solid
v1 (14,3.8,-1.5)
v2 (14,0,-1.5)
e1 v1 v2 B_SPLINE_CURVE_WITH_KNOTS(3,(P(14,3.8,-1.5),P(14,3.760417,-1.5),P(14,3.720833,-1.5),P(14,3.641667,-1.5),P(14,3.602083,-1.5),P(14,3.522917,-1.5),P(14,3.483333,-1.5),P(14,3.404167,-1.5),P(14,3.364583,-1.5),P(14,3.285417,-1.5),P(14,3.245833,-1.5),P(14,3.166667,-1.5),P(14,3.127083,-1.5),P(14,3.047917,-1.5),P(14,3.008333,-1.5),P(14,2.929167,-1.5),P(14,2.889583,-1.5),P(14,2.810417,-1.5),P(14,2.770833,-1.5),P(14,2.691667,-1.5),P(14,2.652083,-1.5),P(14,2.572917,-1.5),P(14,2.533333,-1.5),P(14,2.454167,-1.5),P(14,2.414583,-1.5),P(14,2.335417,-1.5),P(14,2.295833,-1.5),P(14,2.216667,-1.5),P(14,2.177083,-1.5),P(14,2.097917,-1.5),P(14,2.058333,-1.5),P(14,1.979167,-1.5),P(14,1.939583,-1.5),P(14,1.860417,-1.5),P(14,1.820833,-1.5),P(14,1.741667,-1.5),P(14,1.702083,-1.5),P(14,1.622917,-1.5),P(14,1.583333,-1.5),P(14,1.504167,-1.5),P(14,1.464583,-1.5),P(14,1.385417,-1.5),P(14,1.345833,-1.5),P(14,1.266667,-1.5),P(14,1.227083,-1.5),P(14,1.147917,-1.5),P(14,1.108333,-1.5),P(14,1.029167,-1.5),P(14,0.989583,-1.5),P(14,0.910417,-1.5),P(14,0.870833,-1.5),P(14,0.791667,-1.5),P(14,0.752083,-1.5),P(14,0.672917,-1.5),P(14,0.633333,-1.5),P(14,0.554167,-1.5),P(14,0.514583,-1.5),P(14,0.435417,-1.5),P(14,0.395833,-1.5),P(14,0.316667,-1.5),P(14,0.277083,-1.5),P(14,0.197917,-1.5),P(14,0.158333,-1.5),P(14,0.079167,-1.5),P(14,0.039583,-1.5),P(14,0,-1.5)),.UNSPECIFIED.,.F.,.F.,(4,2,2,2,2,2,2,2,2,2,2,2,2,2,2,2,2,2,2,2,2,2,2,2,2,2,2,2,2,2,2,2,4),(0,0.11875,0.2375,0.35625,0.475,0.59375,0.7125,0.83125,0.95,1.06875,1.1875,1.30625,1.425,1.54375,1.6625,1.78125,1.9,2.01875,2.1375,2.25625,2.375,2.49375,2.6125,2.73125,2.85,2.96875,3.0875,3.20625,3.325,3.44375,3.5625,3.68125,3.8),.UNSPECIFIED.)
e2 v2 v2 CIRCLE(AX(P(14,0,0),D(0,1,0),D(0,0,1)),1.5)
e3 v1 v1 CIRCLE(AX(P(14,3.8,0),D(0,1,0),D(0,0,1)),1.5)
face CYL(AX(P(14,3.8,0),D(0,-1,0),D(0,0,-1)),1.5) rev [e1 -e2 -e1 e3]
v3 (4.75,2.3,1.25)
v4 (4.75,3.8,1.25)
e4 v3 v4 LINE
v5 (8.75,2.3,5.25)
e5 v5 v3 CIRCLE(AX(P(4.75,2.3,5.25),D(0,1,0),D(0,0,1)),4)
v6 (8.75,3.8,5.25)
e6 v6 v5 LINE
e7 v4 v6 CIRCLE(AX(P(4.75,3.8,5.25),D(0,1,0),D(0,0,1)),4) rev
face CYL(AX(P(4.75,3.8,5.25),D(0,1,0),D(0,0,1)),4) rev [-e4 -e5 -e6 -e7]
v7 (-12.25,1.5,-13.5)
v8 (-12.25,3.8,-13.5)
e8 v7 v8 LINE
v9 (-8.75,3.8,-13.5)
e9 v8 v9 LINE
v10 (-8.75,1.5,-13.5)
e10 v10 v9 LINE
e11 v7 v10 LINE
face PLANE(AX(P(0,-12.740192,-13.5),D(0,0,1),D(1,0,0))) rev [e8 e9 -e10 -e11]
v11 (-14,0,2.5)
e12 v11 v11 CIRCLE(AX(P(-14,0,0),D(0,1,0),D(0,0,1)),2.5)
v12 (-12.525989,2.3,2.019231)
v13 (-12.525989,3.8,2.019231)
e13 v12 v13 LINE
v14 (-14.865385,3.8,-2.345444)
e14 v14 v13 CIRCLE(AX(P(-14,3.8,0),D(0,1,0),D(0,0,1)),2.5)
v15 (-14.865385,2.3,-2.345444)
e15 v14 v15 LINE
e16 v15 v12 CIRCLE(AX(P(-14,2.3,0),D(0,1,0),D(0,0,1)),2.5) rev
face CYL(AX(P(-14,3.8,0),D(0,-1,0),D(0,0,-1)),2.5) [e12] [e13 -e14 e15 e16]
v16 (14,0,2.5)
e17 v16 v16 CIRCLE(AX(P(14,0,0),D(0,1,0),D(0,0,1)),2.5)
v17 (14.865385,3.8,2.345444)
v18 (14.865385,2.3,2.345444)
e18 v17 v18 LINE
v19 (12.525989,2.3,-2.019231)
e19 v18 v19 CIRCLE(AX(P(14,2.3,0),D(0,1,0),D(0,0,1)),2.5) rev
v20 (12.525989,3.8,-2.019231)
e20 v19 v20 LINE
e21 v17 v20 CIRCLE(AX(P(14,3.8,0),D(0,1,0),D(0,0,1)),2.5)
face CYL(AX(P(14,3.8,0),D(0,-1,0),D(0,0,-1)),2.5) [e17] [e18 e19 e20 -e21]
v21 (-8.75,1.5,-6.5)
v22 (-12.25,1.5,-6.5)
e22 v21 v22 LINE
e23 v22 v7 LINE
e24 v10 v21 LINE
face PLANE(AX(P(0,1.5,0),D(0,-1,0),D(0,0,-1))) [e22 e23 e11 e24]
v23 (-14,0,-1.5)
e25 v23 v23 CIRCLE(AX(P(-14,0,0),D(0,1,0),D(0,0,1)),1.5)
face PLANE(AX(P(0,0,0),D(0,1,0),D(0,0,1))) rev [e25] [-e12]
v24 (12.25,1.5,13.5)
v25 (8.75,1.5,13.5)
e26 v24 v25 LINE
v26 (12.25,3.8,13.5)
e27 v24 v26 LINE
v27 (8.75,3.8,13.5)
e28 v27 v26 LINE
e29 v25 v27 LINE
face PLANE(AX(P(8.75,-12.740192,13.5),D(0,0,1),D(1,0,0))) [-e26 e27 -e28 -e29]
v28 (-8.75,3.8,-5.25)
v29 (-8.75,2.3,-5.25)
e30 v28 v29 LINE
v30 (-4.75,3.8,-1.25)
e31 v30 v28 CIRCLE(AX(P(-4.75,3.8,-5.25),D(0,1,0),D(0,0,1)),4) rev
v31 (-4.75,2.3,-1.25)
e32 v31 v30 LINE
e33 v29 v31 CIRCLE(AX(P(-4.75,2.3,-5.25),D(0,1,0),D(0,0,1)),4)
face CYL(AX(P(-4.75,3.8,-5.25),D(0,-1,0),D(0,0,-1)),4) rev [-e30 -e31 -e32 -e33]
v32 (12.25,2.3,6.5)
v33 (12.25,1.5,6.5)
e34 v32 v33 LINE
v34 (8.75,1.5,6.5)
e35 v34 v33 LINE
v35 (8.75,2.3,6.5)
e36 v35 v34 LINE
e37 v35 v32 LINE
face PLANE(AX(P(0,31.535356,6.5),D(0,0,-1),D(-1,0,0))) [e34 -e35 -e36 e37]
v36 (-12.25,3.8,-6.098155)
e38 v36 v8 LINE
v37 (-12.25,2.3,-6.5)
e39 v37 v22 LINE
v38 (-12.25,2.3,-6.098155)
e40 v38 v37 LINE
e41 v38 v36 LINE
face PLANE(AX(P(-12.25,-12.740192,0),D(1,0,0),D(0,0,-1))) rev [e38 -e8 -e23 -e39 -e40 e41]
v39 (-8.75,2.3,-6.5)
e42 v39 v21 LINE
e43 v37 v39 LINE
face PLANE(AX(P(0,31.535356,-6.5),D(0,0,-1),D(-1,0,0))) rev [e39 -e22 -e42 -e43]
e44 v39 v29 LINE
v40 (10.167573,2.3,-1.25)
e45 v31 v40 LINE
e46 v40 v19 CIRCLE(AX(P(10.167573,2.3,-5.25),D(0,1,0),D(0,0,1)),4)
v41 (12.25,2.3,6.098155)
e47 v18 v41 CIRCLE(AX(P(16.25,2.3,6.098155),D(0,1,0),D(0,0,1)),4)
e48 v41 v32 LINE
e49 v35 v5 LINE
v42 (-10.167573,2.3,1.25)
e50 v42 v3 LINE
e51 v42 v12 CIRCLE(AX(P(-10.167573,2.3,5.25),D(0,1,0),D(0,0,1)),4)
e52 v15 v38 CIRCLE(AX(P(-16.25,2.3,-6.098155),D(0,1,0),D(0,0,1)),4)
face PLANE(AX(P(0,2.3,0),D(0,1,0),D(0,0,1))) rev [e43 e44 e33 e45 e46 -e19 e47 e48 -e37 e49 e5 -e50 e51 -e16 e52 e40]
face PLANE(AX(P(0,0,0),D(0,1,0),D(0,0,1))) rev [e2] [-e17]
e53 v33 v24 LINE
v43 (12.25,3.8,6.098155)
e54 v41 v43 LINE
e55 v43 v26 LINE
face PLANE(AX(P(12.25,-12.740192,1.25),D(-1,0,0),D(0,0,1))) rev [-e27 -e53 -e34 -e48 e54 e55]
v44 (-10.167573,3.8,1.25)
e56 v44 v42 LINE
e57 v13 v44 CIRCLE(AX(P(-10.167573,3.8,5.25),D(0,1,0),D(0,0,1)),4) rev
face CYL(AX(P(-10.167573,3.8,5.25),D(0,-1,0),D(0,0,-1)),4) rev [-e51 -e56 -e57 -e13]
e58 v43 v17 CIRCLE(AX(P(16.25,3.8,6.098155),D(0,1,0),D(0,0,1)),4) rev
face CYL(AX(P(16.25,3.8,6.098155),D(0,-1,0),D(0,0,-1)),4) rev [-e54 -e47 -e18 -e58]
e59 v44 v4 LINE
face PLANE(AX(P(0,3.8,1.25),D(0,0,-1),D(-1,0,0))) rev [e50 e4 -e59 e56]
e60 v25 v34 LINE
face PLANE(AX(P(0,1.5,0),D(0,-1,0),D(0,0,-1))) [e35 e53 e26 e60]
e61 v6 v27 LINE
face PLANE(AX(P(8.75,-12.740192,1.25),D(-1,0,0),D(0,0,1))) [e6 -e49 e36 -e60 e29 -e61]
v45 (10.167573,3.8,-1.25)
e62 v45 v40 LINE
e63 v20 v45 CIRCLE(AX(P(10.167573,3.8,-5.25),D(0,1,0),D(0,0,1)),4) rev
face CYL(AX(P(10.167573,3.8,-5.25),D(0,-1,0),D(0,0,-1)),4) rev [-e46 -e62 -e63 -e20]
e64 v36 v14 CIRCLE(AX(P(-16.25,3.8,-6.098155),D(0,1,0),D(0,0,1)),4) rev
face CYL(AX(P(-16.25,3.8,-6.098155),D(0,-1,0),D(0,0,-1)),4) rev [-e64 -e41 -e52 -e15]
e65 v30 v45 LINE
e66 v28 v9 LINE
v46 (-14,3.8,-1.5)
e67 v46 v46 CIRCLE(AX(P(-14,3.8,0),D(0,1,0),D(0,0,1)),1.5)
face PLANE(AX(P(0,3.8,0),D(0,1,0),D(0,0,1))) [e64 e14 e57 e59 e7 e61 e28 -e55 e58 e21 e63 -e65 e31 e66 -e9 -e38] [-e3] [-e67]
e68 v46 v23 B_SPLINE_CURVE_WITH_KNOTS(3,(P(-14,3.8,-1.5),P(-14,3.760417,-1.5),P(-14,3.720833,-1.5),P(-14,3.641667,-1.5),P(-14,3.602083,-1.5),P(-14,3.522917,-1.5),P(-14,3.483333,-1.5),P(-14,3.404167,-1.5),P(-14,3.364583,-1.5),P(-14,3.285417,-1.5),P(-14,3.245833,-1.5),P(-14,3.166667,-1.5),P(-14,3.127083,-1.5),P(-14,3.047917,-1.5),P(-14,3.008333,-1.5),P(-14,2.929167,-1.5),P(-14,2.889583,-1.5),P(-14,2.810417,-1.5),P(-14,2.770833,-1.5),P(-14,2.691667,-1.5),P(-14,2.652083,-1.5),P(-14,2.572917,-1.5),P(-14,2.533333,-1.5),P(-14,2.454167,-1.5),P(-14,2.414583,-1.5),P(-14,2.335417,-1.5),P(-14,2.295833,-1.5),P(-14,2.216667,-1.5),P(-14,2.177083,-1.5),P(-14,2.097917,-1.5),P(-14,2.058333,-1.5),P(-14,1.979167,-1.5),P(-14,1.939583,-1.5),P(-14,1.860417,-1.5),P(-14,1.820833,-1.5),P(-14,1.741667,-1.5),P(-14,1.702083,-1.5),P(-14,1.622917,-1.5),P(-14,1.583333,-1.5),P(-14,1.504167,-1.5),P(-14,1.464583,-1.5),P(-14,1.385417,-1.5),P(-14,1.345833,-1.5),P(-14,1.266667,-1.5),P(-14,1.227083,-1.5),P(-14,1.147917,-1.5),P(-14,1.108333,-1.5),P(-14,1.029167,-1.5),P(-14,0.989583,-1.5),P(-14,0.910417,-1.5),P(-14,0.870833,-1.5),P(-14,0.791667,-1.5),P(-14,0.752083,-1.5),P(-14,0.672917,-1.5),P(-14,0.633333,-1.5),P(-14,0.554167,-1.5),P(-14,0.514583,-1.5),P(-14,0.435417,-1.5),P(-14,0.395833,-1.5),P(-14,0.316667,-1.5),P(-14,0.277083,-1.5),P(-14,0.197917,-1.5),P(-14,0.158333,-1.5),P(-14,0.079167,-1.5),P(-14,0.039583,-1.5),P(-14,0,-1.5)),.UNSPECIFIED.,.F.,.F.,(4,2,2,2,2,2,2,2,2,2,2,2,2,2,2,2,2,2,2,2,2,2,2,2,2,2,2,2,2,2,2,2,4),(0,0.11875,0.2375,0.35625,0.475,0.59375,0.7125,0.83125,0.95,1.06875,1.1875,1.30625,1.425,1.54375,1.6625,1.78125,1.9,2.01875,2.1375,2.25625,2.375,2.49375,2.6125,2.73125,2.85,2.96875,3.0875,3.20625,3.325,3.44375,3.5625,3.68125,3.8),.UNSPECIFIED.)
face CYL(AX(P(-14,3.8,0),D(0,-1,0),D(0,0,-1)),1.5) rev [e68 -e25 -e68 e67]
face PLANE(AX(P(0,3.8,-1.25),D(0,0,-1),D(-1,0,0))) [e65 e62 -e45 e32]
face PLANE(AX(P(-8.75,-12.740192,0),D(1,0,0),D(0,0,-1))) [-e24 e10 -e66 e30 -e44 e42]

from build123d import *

# Parameters (mm, degrees)
SKETCH1_R           = 1.5
BOSS_EXTRUDE2_DEPTH = 3.8
BOSS_EXTRUDE3_START = -3.8
SKETCH2_W           = 3.5
SKETCH2_H           = 7
SKETCH2_H_2         = 5.25
BOSS_EXTRUDE3_DEPTH = 3.8
CUT_EXTRUDE1_DEPTH  = 2.3
SKETCH4_W           = 3.5
SKETCH4_H           = 7
CUT_EXTRUDE2_DEPTH  = 1.5
FILLET1_R           = 4


with BuildPart() as part:
    # Sketch1 → Boss-Extrude2 (new body)
    # profile 1 of 5: a face of its own
    with BuildSketch(Plane(origin=(0, 0, 0), x_dir=(1, 0, 0), z_dir=(0, 1, 0))):
        with BuildLine():
            Line((-11.834936491, -1.25), (-11.834936491, 1.25))
            ThreePointArc((-11.834936491, 1.25), (-16.5, 0), (-11.834936491, -1.25))
        make_face()
        with Locations(Location((-14, 0, 0), (0, 0, 90))):
            Circle(SKETCH1_R, mode=Mode.SUBTRACT)
    # profile 2 of 5: a face of its own
    with BuildSketch(Plane(origin=(0, 0, 0), x_dir=(1, 0, 0), z_dir=(0, 1, 0))):
        with BuildLine():
            ThreePointArc((-11.5, 0), (-11.585185434, 0.647047613), (-11.834936491, 1.25))
            Line((-11.834936491, 1.25), (-11.834936491, -1.25))
            ThreePointArc((-11.834936491, -1.25), (-11.585185434, -0.647047613), (-11.5, 0))
        make_face()
    # profile 3 of 5: a face of its own
    with BuildSketch(Plane(origin=(0, 0, 0), x_dir=(1, 0, 0), z_dir=(0, 1, 0))):
        with BuildLine():
            Line((11.834936491, 1.25), (-11.834936491, 1.25))
            ThreePointArc((-11.834936491, 1.25), (-11.585185434, 0.647047613), (-11.5, 0))
            ThreePointArc((-11.5, 0), (-11.585185434, -0.647047613), (-11.834936491, -1.25))
            Line((-11.834936491, -1.25), (11.834936491, -1.25))
            ThreePointArc((11.834936491, -1.25), (11.5, 0), (11.834936491, 1.25))
        make_face()
    # profile 4 of 5: a face of its own
    with BuildSketch(Plane(origin=(0, 0, 0), x_dir=(1, 0, 0), z_dir=(0, 1, 0))):
        with BuildLine():
            Line((11.834936491, -1.25), (11.834936491, 1.25))
            ThreePointArc((11.834936491, 1.25), (11.5, 0), (11.834936491, -1.25))
        make_face()
    # profile 5 of 5: a face of its own
    with BuildSketch(Plane(origin=(0, 0, 0), x_dir=(1, 0, 0), z_dir=(0, 1, 0))):
        with BuildLine():
            ThreePointArc((16.5, 0), (14.647047613, 2.414814566), (11.834936491, 1.25))
            Line((11.834936491, 1.25), (11.834936491, -1.25))
            ThreePointArc((11.834936491, -1.25), (14.647047613, -2.414814566), (16.5, 0))
        make_face()
        with Locations(Location((14, 0, 0), (0, 0, 90))):
            Circle(SKETCH1_R, mode=Mode.SUBTRACT)
    extrude(amount=BOSS_EXTRUDE2_DEPTH)

    # Sketch2 → Boss-Extrude3 (add)
    with BuildSketch(Plane(origin=(0, 3.8, 0), x_dir=(1, 0, 0), z_dir=(0, 1, 0)).offset(BOSS_EXTRUDE3_START)):
        with Locations((-10.5, 10)):
            Rectangle(SKETCH2_W, SKETCH2_H)
        with BuildLine():
            Line((-8.75, 6.5), (-12.25, 6.5))
            Line((-12.25, 6.5), (-12.25, 1.785357107))
            ThreePointArc((-12.25, 1.785357107), (-12.024251438, 1.531802083), (-11.834936491, 1.25))
            Line((-11.834936491, 1.25), (-8.75, 1.25))
            Line((-8.75, 1.25), (-8.75, 6.5))
        make_face()
        with Locations((10.5, -3.875)):
            Rectangle(SKETCH2_W, SKETCH2_H_2)
        with Locations((10.5, -10)):
            Rectangle(SKETCH2_W, SKETCH2_H)
    extrude(amount=BOSS_EXTRUDE3_DEPTH)

    # Sketch3 → Cut-Extrude1 (cut)
    with BuildSketch(Plane.XZ):
        with BuildLine():
            Line((11.834936491, 1.25), (8.75, 1.25))
            Line((8.75, 1.25), (-11.834936491, 1.25))
            ThreePointArc((-11.834936491, 1.25), (-11.585185434, 0.647047613), (-11.5, 0))
            ThreePointArc((-11.5, 0), (-11.585185434, -0.647047613), (-11.834936491, -1.25))
            Line((-11.834936491, -1.25), (-8.75, -1.25))
            Line((-8.75, -1.25), (11.834936491, -1.25))
            ThreePointArc((11.834936491, -1.25), (11.5, 0), (11.834936491, 1.25))
        make_face()
        with BuildLine():
            Line((12.25, 6.5), (8.75, 6.5))
            Line((8.75, 6.5), (8.75, 1.25))
            Line((8.75, 1.25), (11.834936491, 1.25))
            ThreePointArc((11.834936491, 1.25), (12.024251438, 1.531802083), (12.25, 1.785357107))
            Line((12.25, 1.785357107), (12.25, 6.5))
        make_face()
        with BuildLine():
            ThreePointArc((-11.834936491, -1.25), (-12.024251438, -1.531802083), (-12.25, -1.785357107))
            Line((-12.25, -1.785357107), (-12.25, -6.5))
            Line((-12.25, -6.5), (-8.75, -6.5))
            Line((-8.75, -6.5), (-8.75, -1.25))
            Line((-8.75, -1.25), (-11.834936491, -1.25))
        make_face()
    extrude(amount=-CUT_EXTRUDE1_DEPTH, mode=Mode.SUBTRACT)

    # Sketch4 → Cut-Extrude2 (cut)
    with BuildSketch(Plane.XZ):
        with Locations((-10.5, -10)):
            Rectangle(SKETCH4_W, SKETCH4_H)
        with Locations((10.5, 10)):
            Rectangle(SKETCH4_W, SKETCH4_H)
    extrude(amount=-CUT_EXTRUDE2_DEPTH, mode=Mode.SUBTRACT)

    # Fillet1
    # the kernel refuses this fillet: 4 mm, written as the material it adds along each edge
    with BuildSketch(Plane(origin=(11.834936491, 2.3, -1.25), x_dir=(-1, 0, 0), z_dir=(0, 1, 0))) as fillet1_piece_1:
        with BuildLine():
            CenterArc((1.66736392, -4), FILLET1_R, 90, 36.128927472)
            ThreePointArc((-0.69105296, -0.769230769), (-0.305320518, -0.420735169), (0, 0))
            Line((0, 0), (1.66736392, 0))
        make_face()
    extrude(amount=1.5)
    with BuildSketch(Plane(origin=(-11.834936491, 2.3, 1.25), x_dir=(-0.668294067479168, 0, 0.743897196776644), z_dir=(0, 1, 0))) as fillet1_piece_2:
        with BuildLine():
            CenterArc((1.861299371, 3.913523616), FILLET1_R, 221.935536264, 36.128927472)
            Line((-1.114289416, 1.240347346), (0, 0))
            ThreePointArc((0, 0), (0.517027603, 0.05404774), (1.034055206, 0))
        make_face()
    extrude(amount=1.5)
    with BuildSketch(Plane(origin=(8.75, 2.3, 1.25), x_dir=(-1, 0, 0), z_dir=(0, 1, 0))) as fillet1_piece_3:
        with BuildLine():
            CenterArc((FILLET1_R, FILLET1_R), FILLET1_R, 180, 90)
            Line((0, FILLET1_R), (0, 0))
            Line((0, 0), (FILLET1_R, 0))
        make_face()
    extrude(amount=1.5)
    with BuildSketch(Plane(origin=(12.25, 3.8, 1.785357107), x_dir=(0.9778293887496555, 0, 0.20940316735301484), z_dir=(0, -1, 0))) as fillet1_piece_4:
        with BuildLine():
            CenterArc((4.81443119, 3.379568307), FILLET1_R, 167.912621371, 69.747753258)
            Line((0.903113635, 4.217180976), (0, 0))
            ThreePointArc((0, 0), (1.337341997, 0.387769808), (2.674683994, 0))
        make_face()
    extrude(amount=1.5)
    with BuildSketch(Plane(origin=(-12.25, 2.3, -1.785357107), x_dir=(-0.9778293887496644, 0, -0.20940316735297415), z_dir=(0, 1, 0))) as fillet1_piece_5:
        with BuildLine():
            CenterArc((4.81443119, -3.379568307), FILLET1_R, 122.339625371, 69.747753258)
            Line((0.903113635, -4.217180976), (0, 0))
            ThreePointArc((0, 0), (1.337341997, -0.387769808), (2.674683994, 0))
        make_face()
    extrude(amount=1.5)
    with BuildSketch(Plane(origin=(-8.75, 2.3, -1.25), x_dir=(0, 0, -1), z_dir=(0, 1, 0))) as fillet1_piece_6:
        with BuildLine():
            CenterArc((FILLET1_R, -FILLET1_R), FILLET1_R, 90, 90)
            Line((0, -FILLET1_R), (0, 0))
            Line((0, 0), (FILLET1_R, 0))
        make_face()
    extrude(amount=1.5)


solid = part.part
